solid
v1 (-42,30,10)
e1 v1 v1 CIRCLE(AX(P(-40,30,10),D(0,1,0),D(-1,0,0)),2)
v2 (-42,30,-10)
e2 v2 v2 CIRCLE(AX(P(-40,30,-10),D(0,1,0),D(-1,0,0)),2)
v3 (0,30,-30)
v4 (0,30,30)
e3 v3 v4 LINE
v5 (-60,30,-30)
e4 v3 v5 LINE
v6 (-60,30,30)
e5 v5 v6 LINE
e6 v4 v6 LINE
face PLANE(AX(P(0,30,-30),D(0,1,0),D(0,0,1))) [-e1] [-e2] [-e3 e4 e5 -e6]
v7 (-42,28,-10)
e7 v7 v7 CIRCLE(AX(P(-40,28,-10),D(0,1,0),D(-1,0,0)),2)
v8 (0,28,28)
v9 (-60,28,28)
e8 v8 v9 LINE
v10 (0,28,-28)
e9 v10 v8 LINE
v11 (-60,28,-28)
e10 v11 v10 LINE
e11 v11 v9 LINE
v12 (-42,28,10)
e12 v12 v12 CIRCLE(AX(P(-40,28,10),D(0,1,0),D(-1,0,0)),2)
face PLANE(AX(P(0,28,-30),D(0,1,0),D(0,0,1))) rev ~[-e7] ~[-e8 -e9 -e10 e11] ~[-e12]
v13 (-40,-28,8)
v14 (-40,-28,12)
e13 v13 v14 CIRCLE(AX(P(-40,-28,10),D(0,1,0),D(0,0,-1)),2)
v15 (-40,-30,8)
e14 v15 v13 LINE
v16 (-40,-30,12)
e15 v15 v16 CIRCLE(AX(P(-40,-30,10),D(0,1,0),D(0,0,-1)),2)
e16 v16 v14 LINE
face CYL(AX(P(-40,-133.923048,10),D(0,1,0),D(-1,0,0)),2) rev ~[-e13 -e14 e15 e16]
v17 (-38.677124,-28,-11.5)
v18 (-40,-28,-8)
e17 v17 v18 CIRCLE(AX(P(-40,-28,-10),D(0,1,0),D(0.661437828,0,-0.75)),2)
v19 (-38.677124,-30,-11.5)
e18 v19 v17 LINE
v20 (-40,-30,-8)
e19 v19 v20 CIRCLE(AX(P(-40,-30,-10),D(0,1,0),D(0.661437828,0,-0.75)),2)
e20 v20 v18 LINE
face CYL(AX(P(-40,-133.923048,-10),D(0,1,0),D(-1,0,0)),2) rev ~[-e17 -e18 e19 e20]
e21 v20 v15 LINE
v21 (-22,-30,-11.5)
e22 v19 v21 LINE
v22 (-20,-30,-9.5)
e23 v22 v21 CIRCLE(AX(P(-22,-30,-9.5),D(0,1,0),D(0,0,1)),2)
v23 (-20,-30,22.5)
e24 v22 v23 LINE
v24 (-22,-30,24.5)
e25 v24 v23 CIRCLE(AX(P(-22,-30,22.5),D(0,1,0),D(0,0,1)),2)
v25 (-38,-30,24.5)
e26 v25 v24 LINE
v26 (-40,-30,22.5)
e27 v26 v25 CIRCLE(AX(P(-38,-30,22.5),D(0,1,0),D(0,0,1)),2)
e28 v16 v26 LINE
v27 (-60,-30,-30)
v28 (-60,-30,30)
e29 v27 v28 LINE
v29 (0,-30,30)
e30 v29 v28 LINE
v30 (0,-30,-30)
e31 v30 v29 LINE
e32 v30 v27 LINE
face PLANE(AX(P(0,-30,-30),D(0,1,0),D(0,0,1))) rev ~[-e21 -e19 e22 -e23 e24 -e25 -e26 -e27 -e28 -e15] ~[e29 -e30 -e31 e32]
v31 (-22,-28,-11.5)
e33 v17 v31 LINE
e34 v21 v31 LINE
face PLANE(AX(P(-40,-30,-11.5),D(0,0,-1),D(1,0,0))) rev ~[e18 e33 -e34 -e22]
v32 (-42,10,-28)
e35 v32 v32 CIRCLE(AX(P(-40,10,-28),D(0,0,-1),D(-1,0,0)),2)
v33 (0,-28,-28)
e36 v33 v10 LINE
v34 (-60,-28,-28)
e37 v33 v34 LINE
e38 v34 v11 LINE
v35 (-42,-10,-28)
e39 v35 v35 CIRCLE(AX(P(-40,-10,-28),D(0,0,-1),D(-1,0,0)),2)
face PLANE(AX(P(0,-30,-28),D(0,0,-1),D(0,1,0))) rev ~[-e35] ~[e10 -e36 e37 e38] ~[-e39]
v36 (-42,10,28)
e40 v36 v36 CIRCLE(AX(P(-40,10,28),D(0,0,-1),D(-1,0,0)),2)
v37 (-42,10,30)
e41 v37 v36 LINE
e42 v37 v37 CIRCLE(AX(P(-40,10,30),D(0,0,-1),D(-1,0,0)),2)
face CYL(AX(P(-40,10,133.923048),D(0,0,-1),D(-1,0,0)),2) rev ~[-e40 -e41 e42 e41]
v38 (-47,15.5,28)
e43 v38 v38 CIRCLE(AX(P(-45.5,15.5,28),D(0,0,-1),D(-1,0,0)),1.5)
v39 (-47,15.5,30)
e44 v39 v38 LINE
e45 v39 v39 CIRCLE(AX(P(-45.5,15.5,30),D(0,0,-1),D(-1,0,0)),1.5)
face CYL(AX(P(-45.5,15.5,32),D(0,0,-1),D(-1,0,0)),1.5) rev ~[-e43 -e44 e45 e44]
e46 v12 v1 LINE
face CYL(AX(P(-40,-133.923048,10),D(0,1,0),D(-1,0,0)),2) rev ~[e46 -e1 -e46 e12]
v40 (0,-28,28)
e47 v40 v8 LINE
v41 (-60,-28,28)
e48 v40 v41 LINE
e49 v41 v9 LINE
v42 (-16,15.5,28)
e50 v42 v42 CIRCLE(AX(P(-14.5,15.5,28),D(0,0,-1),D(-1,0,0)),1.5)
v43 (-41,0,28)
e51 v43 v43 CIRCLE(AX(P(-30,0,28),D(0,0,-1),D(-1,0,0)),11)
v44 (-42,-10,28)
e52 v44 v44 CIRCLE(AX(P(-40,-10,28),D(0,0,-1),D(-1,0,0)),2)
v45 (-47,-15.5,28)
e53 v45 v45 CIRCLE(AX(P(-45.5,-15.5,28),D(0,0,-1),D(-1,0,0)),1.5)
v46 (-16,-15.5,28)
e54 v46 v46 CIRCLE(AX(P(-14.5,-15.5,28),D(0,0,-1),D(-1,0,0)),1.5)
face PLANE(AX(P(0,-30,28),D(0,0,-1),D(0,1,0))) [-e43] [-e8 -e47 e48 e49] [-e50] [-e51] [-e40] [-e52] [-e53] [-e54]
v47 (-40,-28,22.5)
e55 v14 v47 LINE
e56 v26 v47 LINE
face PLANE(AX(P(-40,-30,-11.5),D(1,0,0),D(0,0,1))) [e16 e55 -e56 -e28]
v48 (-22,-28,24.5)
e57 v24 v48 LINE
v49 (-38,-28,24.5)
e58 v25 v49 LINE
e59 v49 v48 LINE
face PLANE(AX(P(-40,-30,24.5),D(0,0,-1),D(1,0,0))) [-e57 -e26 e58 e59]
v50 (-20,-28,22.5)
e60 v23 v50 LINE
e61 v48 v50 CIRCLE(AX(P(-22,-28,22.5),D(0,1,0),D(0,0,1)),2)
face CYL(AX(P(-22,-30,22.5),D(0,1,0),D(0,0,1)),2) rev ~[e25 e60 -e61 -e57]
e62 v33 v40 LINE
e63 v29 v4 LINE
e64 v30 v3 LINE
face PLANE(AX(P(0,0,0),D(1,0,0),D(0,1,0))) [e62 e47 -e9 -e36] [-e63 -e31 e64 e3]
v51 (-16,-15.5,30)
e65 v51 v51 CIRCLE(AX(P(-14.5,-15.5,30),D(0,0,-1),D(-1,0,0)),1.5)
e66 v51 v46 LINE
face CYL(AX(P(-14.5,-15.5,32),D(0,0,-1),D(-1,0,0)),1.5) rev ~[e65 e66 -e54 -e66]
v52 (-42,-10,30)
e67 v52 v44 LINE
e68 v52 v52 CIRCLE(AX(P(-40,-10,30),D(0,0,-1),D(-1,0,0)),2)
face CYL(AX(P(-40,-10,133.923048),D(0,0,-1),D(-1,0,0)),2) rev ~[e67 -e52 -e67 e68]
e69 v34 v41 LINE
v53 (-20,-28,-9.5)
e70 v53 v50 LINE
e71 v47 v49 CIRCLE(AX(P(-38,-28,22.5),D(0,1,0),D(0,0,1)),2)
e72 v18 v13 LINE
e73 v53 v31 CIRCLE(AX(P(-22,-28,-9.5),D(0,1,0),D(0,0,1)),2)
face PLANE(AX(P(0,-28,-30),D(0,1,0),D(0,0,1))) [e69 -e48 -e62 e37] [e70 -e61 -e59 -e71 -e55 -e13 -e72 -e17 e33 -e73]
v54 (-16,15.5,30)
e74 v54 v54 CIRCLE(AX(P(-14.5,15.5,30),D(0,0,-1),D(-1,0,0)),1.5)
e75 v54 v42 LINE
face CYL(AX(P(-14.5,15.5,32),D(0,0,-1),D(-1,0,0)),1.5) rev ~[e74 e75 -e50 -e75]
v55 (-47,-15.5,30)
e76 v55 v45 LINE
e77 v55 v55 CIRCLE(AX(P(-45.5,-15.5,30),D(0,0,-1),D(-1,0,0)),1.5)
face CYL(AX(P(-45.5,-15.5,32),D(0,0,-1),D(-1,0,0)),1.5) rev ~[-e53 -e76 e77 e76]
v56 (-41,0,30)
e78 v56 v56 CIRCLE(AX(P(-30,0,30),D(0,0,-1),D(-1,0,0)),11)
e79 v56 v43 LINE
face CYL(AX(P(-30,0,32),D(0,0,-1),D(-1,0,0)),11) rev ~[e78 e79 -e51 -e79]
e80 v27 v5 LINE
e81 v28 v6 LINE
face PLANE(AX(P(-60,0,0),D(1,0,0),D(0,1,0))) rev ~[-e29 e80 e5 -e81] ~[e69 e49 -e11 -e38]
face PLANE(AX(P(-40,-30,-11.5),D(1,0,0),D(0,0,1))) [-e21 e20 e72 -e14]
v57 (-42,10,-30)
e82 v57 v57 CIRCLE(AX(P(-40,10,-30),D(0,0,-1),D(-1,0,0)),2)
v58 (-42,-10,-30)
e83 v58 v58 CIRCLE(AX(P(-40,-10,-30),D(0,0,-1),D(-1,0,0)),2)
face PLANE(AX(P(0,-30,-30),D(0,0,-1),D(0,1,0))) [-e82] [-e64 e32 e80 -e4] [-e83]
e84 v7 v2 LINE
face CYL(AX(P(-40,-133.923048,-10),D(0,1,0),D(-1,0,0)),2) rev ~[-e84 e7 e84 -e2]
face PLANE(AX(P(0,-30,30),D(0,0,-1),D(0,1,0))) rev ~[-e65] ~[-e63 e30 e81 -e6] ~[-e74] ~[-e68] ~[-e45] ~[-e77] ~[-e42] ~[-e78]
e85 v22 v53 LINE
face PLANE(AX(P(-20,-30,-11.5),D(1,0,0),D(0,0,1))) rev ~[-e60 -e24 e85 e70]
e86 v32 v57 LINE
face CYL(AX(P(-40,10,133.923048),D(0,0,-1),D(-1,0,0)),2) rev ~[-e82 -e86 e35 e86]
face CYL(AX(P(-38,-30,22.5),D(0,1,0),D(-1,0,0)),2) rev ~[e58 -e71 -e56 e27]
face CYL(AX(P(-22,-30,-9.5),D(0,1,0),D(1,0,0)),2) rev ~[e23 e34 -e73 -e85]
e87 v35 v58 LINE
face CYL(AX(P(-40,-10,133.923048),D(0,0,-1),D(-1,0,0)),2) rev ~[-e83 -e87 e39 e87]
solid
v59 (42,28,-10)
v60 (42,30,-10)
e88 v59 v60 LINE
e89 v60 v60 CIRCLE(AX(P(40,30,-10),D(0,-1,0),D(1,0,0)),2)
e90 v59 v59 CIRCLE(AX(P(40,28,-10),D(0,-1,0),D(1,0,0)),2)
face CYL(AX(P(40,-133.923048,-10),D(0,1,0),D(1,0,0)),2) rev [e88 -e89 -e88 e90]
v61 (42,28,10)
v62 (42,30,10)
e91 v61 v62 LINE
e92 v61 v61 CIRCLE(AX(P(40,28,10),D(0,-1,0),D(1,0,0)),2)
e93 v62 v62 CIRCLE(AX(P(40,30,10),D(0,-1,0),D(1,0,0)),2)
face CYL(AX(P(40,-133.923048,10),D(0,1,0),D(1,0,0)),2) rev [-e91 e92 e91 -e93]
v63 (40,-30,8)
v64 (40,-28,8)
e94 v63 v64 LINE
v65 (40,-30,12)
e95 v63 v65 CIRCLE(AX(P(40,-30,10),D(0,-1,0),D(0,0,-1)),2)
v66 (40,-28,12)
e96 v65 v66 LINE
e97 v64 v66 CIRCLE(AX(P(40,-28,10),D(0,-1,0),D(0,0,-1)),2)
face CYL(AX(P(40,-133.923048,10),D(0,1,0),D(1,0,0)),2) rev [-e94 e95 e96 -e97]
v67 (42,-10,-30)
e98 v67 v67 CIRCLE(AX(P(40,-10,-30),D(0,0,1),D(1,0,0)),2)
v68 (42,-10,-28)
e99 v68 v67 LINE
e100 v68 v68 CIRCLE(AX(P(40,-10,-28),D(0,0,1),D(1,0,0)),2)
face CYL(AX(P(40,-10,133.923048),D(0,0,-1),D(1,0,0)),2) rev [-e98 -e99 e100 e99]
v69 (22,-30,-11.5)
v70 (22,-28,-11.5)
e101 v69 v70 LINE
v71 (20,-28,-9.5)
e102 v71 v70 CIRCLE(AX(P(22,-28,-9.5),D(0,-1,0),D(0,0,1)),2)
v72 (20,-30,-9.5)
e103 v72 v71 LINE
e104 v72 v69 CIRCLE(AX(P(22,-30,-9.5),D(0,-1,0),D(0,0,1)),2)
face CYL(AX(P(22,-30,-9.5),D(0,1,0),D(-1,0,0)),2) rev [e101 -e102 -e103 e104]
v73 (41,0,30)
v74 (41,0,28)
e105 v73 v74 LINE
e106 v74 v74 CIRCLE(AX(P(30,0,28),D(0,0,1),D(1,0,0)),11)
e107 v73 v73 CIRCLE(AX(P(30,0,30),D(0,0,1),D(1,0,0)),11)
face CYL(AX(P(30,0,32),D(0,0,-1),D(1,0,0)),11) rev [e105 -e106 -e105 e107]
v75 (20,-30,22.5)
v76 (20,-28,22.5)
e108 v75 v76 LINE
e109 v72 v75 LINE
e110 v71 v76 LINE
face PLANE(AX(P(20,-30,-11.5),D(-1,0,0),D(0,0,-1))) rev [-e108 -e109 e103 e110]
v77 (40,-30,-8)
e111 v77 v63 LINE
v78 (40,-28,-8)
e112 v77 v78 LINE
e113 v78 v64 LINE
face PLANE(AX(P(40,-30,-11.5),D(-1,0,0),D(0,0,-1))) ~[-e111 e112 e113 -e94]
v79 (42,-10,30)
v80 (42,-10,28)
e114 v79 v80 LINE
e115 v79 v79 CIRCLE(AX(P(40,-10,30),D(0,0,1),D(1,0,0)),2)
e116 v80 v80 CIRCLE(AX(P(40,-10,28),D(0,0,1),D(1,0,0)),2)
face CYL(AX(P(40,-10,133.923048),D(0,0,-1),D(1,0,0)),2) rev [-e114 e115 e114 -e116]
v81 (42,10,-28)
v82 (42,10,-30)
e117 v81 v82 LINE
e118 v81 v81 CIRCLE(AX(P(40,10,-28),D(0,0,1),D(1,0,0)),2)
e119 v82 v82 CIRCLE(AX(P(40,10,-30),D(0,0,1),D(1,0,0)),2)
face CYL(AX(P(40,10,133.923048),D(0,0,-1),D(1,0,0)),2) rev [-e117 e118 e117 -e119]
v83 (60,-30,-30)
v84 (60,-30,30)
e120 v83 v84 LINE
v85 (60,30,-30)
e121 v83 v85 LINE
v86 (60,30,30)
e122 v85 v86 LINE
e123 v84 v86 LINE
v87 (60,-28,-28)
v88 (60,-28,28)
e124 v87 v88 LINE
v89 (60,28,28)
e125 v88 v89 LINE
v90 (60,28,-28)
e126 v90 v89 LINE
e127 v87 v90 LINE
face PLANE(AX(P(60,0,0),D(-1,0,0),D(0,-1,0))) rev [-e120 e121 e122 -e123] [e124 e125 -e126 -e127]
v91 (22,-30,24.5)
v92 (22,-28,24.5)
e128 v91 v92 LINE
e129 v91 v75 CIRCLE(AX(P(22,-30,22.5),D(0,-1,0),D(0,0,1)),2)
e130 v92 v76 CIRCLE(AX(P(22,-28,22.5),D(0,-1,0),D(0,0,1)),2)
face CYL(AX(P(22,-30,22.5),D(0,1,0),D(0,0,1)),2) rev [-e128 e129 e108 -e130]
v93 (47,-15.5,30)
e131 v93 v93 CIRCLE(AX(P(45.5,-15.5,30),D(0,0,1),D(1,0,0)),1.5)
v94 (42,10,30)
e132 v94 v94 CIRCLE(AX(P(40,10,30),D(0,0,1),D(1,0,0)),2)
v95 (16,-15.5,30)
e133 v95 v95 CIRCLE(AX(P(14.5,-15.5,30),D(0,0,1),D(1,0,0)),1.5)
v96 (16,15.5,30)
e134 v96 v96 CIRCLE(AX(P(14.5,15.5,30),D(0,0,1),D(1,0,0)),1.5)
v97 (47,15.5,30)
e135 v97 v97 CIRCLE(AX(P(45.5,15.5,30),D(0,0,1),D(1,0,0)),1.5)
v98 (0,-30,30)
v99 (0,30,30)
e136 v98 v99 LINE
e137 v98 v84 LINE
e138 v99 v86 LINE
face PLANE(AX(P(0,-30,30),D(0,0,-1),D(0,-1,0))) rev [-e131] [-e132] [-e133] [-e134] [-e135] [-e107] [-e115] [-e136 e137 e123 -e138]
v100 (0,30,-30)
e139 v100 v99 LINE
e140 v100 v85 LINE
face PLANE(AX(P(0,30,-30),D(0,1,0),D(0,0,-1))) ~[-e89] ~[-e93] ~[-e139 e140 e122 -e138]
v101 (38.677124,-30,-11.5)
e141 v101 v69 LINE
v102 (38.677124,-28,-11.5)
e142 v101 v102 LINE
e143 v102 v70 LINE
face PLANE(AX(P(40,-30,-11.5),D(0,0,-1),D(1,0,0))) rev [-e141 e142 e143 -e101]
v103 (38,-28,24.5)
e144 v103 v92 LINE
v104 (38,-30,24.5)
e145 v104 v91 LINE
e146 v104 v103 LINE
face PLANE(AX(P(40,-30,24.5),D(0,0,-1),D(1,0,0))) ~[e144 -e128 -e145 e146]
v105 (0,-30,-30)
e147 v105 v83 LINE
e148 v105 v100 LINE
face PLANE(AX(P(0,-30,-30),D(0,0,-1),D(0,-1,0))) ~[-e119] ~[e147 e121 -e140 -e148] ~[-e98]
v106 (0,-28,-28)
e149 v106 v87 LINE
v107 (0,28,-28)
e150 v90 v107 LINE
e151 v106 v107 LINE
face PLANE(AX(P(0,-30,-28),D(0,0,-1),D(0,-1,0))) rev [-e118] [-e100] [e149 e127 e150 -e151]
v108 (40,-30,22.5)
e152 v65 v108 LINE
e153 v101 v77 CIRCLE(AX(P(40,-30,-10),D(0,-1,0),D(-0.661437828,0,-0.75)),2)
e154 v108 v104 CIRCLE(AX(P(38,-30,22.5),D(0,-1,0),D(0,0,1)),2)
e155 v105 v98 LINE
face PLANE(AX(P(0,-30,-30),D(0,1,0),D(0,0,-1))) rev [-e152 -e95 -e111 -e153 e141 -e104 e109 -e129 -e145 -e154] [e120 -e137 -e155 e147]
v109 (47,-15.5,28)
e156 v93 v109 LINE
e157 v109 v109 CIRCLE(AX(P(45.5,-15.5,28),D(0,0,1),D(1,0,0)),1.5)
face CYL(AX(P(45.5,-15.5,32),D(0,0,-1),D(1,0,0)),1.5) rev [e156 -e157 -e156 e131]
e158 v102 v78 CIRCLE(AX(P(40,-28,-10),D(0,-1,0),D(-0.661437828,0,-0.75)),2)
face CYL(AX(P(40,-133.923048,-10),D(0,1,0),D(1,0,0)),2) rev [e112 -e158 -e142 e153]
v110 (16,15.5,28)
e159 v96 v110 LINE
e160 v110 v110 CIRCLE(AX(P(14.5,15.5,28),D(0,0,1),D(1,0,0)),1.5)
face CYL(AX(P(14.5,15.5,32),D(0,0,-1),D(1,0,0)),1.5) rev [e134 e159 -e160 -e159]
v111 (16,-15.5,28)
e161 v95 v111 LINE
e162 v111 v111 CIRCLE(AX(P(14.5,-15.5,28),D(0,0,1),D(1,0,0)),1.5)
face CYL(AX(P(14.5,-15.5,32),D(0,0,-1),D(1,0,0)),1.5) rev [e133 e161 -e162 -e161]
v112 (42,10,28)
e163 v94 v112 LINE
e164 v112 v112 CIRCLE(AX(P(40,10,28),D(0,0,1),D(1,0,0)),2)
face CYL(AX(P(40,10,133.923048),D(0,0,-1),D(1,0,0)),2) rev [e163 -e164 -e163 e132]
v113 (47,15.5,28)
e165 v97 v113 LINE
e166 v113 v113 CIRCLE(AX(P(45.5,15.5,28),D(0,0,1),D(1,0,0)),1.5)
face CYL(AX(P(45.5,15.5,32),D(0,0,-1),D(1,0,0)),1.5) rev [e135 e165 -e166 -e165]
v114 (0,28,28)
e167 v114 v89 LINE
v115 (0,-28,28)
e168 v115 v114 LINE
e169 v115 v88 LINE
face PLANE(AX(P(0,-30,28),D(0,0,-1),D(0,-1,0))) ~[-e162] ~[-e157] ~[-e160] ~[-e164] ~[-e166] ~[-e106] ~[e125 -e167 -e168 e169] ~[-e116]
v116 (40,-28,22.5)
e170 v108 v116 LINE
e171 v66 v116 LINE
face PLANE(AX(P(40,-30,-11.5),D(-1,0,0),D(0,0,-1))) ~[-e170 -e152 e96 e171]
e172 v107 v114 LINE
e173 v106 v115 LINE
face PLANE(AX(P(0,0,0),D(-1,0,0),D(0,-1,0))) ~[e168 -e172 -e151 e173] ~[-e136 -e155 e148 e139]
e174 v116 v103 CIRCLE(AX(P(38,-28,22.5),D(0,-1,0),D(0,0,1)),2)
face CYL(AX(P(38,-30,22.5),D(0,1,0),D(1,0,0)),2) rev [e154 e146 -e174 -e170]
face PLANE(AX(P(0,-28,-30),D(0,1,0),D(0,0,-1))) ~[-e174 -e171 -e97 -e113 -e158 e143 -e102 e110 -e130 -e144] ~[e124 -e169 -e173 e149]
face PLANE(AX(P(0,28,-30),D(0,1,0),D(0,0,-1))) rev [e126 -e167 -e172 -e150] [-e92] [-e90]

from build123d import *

# Parameters (mm, degrees)
F0_W     = 60
F0_H     = 60
F1_DEPTH = 60
F2_T     = -2
F4_D     = 4
F5_D     = 22
F5_DEPTH = 2
F5_TIP   = 6.6094668093
F6_D     = 3
F6_DEPTH = 2
F6_TIP   = 0.9012909285
F8_D     = 4
F7_W     = 20
F7_H     = 36
F9_DEPTH = 2
F10_R    = 2


with BuildPart() as f1:
    # F0 (on Right) → F1 (new body)
    with BuildSketch(Plane.YZ):
        Rectangle(F0_W, F0_H)
    extrude(amount=-F1_DEPTH)

    # F2
    f2_openings = [f1.faces().sort_by_distance(p)[0] for p in [
        (-60, 0, 0),
        (0, 0, 0),
    ]]
    offset(amount=F2_T, openings=f2_openings)

    # F4 (through all)
    with Locations(Plane.XY.offset(30)):
        with Locations((-40, 10), (-40, -10)):
            Hole(F4_D / 2)

    # F5
    with Locations(Plane.XY.offset(30)):
        with Locations((-30, 0)):
            Hole(F5_D / 2, depth=F5_DEPTH)
            with Locations((0, 0, -(F5_DEPTH + F5_TIP / 2))):  # 118° drill point
                Cone(0, F5_D / 2, F5_TIP, mode=Mode.SUBTRACT)

    # F6
    with Locations(Plane.XY.offset(30)):
        with Locations((-45.5, 15.5), (-14.5, 15.5), (-14.5, -15.5), (-45.5, -15.5)):
            Hole(F6_D / 2, depth=F6_DEPTH)
            with Locations((0, 0, -(F6_DEPTH + F6_TIP / 2))):  # 118° drill point
                Cone(0, F6_D / 2, F6_TIP, mode=Mode.SUBTRACT)

    # F8 (through all)
    with Locations(Plane.XZ.offset(30)):
        with Locations((-40, 10), (-40, -10)):
            Hole(F8_D / 2)

    # F7 (on face) → F9 (cut)
    with BuildSketch(Plane.XZ.offset(30)):
        with Locations((-30, 6.5)):
            Rectangle(F7_W, F7_H)
    extrude(amount=-F9_DEPTH, mode=Mode.SUBTRACT)

    # F10
    f10_edges = [f1.edges().sort_by_distance(p)[0] for p in [
        (-40, -29, 24.5),
        (-20, -29, 24.5),
        (-20, -29, -11.5),
    ]]
    fillet(f10_edges, radius=F10_R)


with BuildPart() as f11_1:
    # F11: instance of F1
    add(f1.part.mirror(Plane.YZ))


solid = Compound([f1.part, f11_1.part])
